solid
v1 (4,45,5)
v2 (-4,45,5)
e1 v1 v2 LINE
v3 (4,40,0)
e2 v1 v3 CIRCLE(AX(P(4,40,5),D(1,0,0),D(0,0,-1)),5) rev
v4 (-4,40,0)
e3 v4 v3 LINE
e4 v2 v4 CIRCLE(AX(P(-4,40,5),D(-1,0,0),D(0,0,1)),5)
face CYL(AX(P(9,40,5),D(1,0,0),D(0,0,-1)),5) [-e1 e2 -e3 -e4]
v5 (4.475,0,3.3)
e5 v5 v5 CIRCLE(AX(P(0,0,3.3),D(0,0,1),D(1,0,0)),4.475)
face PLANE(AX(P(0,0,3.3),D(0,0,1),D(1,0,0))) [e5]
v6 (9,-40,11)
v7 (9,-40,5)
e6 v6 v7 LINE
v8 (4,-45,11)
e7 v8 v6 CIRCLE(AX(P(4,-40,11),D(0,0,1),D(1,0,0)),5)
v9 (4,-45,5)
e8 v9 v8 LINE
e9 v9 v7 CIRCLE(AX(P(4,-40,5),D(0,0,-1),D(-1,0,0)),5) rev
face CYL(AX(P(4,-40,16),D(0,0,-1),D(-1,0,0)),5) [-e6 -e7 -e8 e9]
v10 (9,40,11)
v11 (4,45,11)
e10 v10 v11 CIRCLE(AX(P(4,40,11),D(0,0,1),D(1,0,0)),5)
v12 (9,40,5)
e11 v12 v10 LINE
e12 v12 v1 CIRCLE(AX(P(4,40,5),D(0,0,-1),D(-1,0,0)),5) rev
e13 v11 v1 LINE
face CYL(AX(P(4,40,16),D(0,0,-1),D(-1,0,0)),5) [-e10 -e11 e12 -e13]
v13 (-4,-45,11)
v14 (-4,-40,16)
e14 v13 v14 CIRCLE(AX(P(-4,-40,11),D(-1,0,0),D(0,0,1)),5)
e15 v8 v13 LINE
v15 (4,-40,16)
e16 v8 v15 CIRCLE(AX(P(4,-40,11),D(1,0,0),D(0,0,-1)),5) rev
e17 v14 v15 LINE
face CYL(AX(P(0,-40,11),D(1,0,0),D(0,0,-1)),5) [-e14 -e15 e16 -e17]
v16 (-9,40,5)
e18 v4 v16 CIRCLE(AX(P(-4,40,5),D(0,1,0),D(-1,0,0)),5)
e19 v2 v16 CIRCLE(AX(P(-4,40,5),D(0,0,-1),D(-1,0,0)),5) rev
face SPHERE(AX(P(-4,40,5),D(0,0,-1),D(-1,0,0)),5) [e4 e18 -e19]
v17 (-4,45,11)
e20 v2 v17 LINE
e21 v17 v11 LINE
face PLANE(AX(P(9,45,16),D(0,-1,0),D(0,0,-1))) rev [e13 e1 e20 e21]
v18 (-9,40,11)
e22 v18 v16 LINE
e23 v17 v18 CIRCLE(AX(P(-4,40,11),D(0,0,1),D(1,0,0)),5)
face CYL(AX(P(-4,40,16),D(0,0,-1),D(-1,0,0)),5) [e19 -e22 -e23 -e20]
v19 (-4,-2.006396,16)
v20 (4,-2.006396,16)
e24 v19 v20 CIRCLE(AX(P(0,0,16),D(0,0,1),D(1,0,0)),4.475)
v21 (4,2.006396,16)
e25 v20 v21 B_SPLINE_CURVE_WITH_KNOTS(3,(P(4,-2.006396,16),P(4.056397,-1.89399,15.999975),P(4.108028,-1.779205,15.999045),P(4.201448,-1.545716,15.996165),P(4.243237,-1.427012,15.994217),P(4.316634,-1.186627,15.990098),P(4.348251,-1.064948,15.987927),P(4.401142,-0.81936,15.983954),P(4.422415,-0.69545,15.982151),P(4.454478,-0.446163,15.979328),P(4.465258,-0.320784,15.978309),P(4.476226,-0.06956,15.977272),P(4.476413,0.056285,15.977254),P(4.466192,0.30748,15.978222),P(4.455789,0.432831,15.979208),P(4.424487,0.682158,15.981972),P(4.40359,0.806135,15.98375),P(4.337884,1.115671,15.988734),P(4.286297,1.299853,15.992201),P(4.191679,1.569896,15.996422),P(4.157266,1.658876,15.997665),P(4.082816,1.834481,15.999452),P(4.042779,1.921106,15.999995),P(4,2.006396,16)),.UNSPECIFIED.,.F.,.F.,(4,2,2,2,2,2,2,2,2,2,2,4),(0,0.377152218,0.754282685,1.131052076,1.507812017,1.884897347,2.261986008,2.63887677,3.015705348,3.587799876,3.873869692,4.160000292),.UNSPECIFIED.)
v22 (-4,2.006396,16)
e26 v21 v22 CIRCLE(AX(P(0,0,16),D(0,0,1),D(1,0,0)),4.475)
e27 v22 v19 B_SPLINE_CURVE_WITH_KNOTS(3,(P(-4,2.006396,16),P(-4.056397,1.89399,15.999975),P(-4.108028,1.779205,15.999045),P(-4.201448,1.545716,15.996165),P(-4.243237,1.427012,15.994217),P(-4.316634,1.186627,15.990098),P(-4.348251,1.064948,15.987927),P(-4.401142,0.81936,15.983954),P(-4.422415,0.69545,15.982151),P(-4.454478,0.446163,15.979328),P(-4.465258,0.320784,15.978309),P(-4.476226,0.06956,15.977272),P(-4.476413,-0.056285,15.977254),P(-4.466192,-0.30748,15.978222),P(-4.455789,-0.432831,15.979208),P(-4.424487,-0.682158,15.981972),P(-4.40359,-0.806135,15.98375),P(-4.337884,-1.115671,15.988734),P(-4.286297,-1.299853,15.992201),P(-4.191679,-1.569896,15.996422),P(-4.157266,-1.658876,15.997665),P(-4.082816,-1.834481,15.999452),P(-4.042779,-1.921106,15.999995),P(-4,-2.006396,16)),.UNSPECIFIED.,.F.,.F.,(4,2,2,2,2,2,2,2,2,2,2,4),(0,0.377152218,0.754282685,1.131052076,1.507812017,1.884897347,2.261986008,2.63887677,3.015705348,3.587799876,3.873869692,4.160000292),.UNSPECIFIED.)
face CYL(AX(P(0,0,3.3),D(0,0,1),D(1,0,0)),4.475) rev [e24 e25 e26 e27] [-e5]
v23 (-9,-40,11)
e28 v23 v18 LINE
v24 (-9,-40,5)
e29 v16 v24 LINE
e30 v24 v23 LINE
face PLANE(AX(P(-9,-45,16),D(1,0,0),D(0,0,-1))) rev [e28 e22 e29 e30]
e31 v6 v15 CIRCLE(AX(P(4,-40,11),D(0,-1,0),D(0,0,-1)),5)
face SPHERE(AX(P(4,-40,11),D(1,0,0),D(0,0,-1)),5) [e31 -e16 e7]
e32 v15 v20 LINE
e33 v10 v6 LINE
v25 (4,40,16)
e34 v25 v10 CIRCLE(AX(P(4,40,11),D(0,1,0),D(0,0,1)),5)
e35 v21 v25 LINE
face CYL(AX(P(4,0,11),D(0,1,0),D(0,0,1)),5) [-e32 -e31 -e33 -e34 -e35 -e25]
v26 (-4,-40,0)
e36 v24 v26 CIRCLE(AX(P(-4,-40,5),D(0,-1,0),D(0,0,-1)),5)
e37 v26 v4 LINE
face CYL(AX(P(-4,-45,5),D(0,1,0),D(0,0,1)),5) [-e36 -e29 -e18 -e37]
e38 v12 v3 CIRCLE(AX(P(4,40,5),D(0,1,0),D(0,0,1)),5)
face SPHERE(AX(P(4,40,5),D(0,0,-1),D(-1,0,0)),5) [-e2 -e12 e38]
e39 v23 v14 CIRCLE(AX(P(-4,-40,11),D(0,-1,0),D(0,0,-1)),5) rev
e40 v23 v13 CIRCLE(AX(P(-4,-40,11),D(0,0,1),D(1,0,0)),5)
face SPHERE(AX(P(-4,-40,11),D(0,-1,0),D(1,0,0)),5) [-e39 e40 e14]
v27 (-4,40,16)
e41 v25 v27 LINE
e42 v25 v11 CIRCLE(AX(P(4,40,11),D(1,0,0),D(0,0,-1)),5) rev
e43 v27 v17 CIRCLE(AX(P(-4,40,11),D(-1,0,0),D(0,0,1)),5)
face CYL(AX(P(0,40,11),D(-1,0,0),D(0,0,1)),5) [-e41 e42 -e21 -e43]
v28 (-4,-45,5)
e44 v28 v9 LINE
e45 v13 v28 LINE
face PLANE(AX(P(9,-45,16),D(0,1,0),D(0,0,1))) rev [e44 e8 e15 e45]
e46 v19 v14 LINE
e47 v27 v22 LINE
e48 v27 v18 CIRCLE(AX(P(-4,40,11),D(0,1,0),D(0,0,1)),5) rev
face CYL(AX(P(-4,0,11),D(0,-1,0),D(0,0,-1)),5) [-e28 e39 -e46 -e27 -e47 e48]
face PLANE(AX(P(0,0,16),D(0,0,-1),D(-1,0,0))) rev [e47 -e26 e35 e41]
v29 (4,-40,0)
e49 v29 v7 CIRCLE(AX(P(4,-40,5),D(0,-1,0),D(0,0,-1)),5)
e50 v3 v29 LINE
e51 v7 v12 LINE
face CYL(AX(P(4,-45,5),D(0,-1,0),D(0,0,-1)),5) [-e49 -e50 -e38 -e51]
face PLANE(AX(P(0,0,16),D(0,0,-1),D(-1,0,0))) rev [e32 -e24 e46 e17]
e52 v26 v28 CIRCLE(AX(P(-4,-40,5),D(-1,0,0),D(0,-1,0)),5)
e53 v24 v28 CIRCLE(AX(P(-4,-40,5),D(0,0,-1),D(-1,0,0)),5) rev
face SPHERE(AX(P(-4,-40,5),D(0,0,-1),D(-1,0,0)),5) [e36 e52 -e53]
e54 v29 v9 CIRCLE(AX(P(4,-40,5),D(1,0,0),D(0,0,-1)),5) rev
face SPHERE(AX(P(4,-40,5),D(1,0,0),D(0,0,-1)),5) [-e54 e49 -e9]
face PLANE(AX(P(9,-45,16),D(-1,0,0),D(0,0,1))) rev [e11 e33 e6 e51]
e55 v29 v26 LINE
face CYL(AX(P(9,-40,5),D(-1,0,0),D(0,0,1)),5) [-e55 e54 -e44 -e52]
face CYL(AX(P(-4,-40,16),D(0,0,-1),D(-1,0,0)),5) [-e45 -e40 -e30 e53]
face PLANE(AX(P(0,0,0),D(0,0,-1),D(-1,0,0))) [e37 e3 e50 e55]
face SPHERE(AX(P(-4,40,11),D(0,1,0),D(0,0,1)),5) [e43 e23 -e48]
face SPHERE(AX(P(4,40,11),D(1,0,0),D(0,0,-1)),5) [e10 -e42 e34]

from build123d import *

# Parameters (mm, degrees)
SKETCH7_W           = 90
SKETCH7_H           = 18
BOSS_EXTRUDE1_DEPTH = 16
SKETCH8_R           = 4.475
CUT_EXTRUDE2_DEPTH  = 12.7
FILLET1_R           = 5


with BuildPart() as part:
    # Sketch7 → Boss-Extrude1 (new body)
    with BuildSketch(Plane(origin=(0, 0, 0), x_dir=(0, 1, 0), z_dir=(0, 0, 1))):
        Rectangle(SKETCH7_W, SKETCH7_H)
    extrude(amount=BOSS_EXTRUDE1_DEPTH)

    # Sketch8 → Cut-Extrude2 (cut)
    with BuildSketch(Plane(origin=(0, 0, 16), x_dir=(0, -1, 0), z_dir=(0, 0, 1))):
        with Locations(Location((0, 0, 0), (0, 0, 90))):
            Circle(SKETCH8_R)
    extrude(amount=-CUT_EXTRUDE2_DEPTH, mode=Mode.SUBTRACT)

    # Fillet1
    # the kernel refuses this fillet: 5 mm, written as the material it takes off along each edge
    with BuildSketch(Plane(origin=(-4, -40, 11), x_dir=(0, 0, 1), z_dir=(0, -1, 0))) as fillet1_piece_1_section:
        Polygon((0, 0), (FILLET1_R, 0), (FILLET1_R, FILLET1_R), (0, FILLET1_R), align=None)
    fillet1_piece_1 = extrude(amount=FILLET1_R, mode=Mode.PRIVATE)
    fillet1_piece_1 = fillet1_piece_1 - Plane(origin=(-4, -40, 11), x_dir=(0.7071067811865475, 0, -0.7071067811865475), z_dir=(0, -1, 0)) * Sphere(FILLET1_R, mode=Mode.PRIVATE)
    add(fillet1_piece_1, mode=Mode.SUBTRACT)
    with BuildSketch(Plane(origin=(4, -40, 11), x_dir=(0, -1, 0), z_dir=(1, 0, 0))) as fillet1_piece_2_section:
        Polygon((0, 0), (FILLET1_R, 0), (FILLET1_R, -FILLET1_R), (0, -FILLET1_R), align=None)
    fillet1_piece_2 = extrude(amount=FILLET1_R, mode=Mode.PRIVATE)
    fillet1_piece_2 = fillet1_piece_2 - Plane(origin=(4, -40, 11), x_dir=(0, 0.7071067811865475, -0.7071067811865475), z_dir=(1, 0, 0)) * Sphere(FILLET1_R, mode=Mode.PRIVATE)
    add(fillet1_piece_2, mode=Mode.SUBTRACT)
    with BuildSketch(Plane(origin=(4, 40, 11), x_dir=(0, 1, 0), z_dir=(1, 0, 0))) as fillet1_piece_3_section:
        Polygon((0, 0), (FILLET1_R, 0), (FILLET1_R, FILLET1_R), (0, FILLET1_R), align=None)
    fillet1_piece_3 = extrude(amount=FILLET1_R, mode=Mode.PRIVATE)
    fillet1_piece_3 = fillet1_piece_3 - Plane(origin=(4, 40, 11), x_dir=(0, -0.7071067811865475, -0.7071067811865475), z_dir=(1, 0, 0)) * Sphere(FILLET1_R, mode=Mode.PRIVATE)
    add(fillet1_piece_3, mode=Mode.SUBTRACT)
    with BuildSketch(Plane(origin=(-4, 40, 11), x_dir=(0, 0, 1), z_dir=(0, 1, 0))) as fillet1_piece_4_section:
        Polygon((0, 0), (FILLET1_R, 0), (FILLET1_R, -FILLET1_R), (0, -FILLET1_R), align=None)
    fillet1_piece_4 = extrude(amount=FILLET1_R, mode=Mode.PRIVATE)
    fillet1_piece_4 = fillet1_piece_4 - Plane(origin=(-4, 40, 11), x_dir=(0.7071067811865475, 0, -0.7071067811865475), z_dir=(0, 1, 0)) * Sphere(FILLET1_R, mode=Mode.PRIVATE)
    add(fillet1_piece_4, mode=Mode.SUBTRACT)
    with BuildSketch(Plane(origin=(4, -40, 5), x_dir=(0, -1, 0), z_dir=(1, 0, 0))) as fillet1_piece_5_section:
        Polygon((0, 0), (FILLET1_R, 0), (FILLET1_R, FILLET1_R), (0, FILLET1_R), align=None)
    fillet1_piece_5 = extrude(amount=FILLET1_R, mode=Mode.PRIVATE)
    fillet1_piece_5 = fillet1_piece_5 - Plane(origin=(4, -40, 5), x_dir=(0, 0.7071067811865475, 0.7071067811865475), z_dir=(1, 0, 0)) * Sphere(FILLET1_R, mode=Mode.PRIVATE)
    add(fillet1_piece_5, mode=Mode.SUBTRACT)
    with BuildSketch(Plane(origin=(4, 40, 5), x_dir=(0, 1, 0), z_dir=(1, 0, 0))) as fillet1_piece_6_section:
        Polygon((0, 0), (FILLET1_R, 0), (FILLET1_R, -FILLET1_R), (0, -FILLET1_R), align=None)
    fillet1_piece_6 = extrude(amount=FILLET1_R, mode=Mode.PRIVATE)
    fillet1_piece_6 = fillet1_piece_6 - Plane(origin=(4, 40, 5), x_dir=(0, -0.7071067811865475, 0.7071067811865475), z_dir=(1, 0, 0)) * Sphere(FILLET1_R, mode=Mode.PRIVATE)
    add(fillet1_piece_6, mode=Mode.SUBTRACT)
    with BuildSketch(Plane(origin=(-4, -40, 5), x_dir=(0, 0, -1), z_dir=(0, -1, 0))) as fillet1_piece_7_section:
        Polygon((0, 0), (FILLET1_R, 0), (FILLET1_R, -FILLET1_R), (0, -FILLET1_R), align=None)
    fillet1_piece_7 = extrude(amount=FILLET1_R, mode=Mode.PRIVATE)
    fillet1_piece_7 = fillet1_piece_7 - Plane(origin=(-4, -40, 5), x_dir=(0.7071067811865475, 0, 0.7071067811865475), z_dir=(0, -1, 0)) * Sphere(FILLET1_R, mode=Mode.PRIVATE)
    add(fillet1_piece_7, mode=Mode.SUBTRACT)
    with BuildSketch(Plane(origin=(-4, 40, 5), x_dir=(0, 0, -1), z_dir=(0, 1, 0))) as fillet1_piece_8_section:
        Polygon((0, 0), (FILLET1_R, 0), (FILLET1_R, FILLET1_R), (0, FILLET1_R), align=None)
    fillet1_piece_8 = extrude(amount=FILLET1_R, mode=Mode.PRIVATE)
    fillet1_piece_8 = fillet1_piece_8 - Plane(origin=(-4, 40, 5), x_dir=(0.7071067811865475, 0, 0.7071067811865475), z_dir=(0, 1, 0)) * Sphere(FILLET1_R, mode=Mode.PRIVATE)
    add(fillet1_piece_8, mode=Mode.SUBTRACT)
    with BuildSketch(Plane(origin=(-4, -45, 16), x_dir=(0, 0, -1), z_dir=(1, 0, 0)), Plane(origin=(4, 45, 16), x_dir=(0, 0, -1), z_dir=(-1, 0, 0))) as fillet1_piece_9:
        with BuildLine():
            CenterArc((FILLET1_R, FILLET1_R), FILLET1_R, 180, 90)
            Line((0, FILLET1_R), (0, 0))
            Line((0, 0), (FILLET1_R, 0))
        make_face()
    extrude(amount=8, mode=Mode.SUBTRACT)
    with BuildSketch(Plane(origin=(9, -40, 16), x_dir=(0, 0, -1), z_dir=(0, 1, 0)), Plane(origin=(-9, 40, 0), x_dir=(1, 0, 0), z_dir=(0, -1, 0))) as fillet1_piece_10:
        with BuildLine():
            CenterArc((FILLET1_R, FILLET1_R), FILLET1_R, 180, 90)
            Line((0, FILLET1_R), (0, 0))
            Line((0, 0), (FILLET1_R, 0))
        make_face()
    extrude(amount=80, mode=Mode.SUBTRACT)
    with BuildSketch(Plane(origin=(9, -40, 0), x_dir=(0, 0, 1), z_dir=(0, 1, 0)), Plane(origin=(-9, 40, 16), x_dir=(1, 0, 0), z_dir=(0, -1, 0))) as fillet1_piece_11:
        with BuildLine():
            CenterArc((FILLET1_R, -FILLET1_R), FILLET1_R, 90, 90)
            Line((0, -FILLET1_R), (0, 0))
            Line((0, 0), (FILLET1_R, 0))
        make_face()
    extrude(amount=80, mode=Mode.SUBTRACT)
    with BuildSketch(Plane(origin=(-4, -45, 0), x_dir=(0, 0, 1), z_dir=(1, 0, 0)), Plane(origin=(4, 45, 0), x_dir=(0, 0, 1), z_dir=(-1, 0, 0))) as fillet1_piece_12:
        with BuildLine():
            CenterArc((FILLET1_R, -FILLET1_R), FILLET1_R, 90, 90)
            Line((0, -FILLET1_R), (0, 0))
            Line((0, 0), (FILLET1_R, 0))
        make_face()
    extrude(amount=8, mode=Mode.SUBTRACT)
    with BuildSketch(Plane(origin=(9, 45, 5), x_dir=(0, -1, 0), z_dir=(0, 0, 1)), Plane(origin=(-9, 45, 5), x_dir=(1, 0, 0), z_dir=(0, 0, 1))) as fillet1_piece_13:
        with BuildLine():
            CenterArc((FILLET1_R, -FILLET1_R), FILLET1_R, 90, 90)
            Line((0, -FILLET1_R), (0, 0))
            Line((0, 0), (FILLET1_R, 0))
        make_face()
    extrude(amount=6, mode=Mode.SUBTRACT)
    with BuildSketch(Plane(origin=(9, -45, 5), x_dir=(0, 1, 0), z_dir=(0, 0, 1)), Plane(origin=(-9, -45, 5), x_dir=(1, 0, 0), z_dir=(0, 0, 1))) as fillet1_piece_14:
        with BuildLine():
            CenterArc((FILLET1_R, FILLET1_R), FILLET1_R, 180, 90)
            Line((0, FILLET1_R), (0, 0))
            Line((0, 0), (FILLET1_R, 0))
        make_face()
    extrude(amount=6, mode=Mode.SUBTRACT)


solid = part.part
